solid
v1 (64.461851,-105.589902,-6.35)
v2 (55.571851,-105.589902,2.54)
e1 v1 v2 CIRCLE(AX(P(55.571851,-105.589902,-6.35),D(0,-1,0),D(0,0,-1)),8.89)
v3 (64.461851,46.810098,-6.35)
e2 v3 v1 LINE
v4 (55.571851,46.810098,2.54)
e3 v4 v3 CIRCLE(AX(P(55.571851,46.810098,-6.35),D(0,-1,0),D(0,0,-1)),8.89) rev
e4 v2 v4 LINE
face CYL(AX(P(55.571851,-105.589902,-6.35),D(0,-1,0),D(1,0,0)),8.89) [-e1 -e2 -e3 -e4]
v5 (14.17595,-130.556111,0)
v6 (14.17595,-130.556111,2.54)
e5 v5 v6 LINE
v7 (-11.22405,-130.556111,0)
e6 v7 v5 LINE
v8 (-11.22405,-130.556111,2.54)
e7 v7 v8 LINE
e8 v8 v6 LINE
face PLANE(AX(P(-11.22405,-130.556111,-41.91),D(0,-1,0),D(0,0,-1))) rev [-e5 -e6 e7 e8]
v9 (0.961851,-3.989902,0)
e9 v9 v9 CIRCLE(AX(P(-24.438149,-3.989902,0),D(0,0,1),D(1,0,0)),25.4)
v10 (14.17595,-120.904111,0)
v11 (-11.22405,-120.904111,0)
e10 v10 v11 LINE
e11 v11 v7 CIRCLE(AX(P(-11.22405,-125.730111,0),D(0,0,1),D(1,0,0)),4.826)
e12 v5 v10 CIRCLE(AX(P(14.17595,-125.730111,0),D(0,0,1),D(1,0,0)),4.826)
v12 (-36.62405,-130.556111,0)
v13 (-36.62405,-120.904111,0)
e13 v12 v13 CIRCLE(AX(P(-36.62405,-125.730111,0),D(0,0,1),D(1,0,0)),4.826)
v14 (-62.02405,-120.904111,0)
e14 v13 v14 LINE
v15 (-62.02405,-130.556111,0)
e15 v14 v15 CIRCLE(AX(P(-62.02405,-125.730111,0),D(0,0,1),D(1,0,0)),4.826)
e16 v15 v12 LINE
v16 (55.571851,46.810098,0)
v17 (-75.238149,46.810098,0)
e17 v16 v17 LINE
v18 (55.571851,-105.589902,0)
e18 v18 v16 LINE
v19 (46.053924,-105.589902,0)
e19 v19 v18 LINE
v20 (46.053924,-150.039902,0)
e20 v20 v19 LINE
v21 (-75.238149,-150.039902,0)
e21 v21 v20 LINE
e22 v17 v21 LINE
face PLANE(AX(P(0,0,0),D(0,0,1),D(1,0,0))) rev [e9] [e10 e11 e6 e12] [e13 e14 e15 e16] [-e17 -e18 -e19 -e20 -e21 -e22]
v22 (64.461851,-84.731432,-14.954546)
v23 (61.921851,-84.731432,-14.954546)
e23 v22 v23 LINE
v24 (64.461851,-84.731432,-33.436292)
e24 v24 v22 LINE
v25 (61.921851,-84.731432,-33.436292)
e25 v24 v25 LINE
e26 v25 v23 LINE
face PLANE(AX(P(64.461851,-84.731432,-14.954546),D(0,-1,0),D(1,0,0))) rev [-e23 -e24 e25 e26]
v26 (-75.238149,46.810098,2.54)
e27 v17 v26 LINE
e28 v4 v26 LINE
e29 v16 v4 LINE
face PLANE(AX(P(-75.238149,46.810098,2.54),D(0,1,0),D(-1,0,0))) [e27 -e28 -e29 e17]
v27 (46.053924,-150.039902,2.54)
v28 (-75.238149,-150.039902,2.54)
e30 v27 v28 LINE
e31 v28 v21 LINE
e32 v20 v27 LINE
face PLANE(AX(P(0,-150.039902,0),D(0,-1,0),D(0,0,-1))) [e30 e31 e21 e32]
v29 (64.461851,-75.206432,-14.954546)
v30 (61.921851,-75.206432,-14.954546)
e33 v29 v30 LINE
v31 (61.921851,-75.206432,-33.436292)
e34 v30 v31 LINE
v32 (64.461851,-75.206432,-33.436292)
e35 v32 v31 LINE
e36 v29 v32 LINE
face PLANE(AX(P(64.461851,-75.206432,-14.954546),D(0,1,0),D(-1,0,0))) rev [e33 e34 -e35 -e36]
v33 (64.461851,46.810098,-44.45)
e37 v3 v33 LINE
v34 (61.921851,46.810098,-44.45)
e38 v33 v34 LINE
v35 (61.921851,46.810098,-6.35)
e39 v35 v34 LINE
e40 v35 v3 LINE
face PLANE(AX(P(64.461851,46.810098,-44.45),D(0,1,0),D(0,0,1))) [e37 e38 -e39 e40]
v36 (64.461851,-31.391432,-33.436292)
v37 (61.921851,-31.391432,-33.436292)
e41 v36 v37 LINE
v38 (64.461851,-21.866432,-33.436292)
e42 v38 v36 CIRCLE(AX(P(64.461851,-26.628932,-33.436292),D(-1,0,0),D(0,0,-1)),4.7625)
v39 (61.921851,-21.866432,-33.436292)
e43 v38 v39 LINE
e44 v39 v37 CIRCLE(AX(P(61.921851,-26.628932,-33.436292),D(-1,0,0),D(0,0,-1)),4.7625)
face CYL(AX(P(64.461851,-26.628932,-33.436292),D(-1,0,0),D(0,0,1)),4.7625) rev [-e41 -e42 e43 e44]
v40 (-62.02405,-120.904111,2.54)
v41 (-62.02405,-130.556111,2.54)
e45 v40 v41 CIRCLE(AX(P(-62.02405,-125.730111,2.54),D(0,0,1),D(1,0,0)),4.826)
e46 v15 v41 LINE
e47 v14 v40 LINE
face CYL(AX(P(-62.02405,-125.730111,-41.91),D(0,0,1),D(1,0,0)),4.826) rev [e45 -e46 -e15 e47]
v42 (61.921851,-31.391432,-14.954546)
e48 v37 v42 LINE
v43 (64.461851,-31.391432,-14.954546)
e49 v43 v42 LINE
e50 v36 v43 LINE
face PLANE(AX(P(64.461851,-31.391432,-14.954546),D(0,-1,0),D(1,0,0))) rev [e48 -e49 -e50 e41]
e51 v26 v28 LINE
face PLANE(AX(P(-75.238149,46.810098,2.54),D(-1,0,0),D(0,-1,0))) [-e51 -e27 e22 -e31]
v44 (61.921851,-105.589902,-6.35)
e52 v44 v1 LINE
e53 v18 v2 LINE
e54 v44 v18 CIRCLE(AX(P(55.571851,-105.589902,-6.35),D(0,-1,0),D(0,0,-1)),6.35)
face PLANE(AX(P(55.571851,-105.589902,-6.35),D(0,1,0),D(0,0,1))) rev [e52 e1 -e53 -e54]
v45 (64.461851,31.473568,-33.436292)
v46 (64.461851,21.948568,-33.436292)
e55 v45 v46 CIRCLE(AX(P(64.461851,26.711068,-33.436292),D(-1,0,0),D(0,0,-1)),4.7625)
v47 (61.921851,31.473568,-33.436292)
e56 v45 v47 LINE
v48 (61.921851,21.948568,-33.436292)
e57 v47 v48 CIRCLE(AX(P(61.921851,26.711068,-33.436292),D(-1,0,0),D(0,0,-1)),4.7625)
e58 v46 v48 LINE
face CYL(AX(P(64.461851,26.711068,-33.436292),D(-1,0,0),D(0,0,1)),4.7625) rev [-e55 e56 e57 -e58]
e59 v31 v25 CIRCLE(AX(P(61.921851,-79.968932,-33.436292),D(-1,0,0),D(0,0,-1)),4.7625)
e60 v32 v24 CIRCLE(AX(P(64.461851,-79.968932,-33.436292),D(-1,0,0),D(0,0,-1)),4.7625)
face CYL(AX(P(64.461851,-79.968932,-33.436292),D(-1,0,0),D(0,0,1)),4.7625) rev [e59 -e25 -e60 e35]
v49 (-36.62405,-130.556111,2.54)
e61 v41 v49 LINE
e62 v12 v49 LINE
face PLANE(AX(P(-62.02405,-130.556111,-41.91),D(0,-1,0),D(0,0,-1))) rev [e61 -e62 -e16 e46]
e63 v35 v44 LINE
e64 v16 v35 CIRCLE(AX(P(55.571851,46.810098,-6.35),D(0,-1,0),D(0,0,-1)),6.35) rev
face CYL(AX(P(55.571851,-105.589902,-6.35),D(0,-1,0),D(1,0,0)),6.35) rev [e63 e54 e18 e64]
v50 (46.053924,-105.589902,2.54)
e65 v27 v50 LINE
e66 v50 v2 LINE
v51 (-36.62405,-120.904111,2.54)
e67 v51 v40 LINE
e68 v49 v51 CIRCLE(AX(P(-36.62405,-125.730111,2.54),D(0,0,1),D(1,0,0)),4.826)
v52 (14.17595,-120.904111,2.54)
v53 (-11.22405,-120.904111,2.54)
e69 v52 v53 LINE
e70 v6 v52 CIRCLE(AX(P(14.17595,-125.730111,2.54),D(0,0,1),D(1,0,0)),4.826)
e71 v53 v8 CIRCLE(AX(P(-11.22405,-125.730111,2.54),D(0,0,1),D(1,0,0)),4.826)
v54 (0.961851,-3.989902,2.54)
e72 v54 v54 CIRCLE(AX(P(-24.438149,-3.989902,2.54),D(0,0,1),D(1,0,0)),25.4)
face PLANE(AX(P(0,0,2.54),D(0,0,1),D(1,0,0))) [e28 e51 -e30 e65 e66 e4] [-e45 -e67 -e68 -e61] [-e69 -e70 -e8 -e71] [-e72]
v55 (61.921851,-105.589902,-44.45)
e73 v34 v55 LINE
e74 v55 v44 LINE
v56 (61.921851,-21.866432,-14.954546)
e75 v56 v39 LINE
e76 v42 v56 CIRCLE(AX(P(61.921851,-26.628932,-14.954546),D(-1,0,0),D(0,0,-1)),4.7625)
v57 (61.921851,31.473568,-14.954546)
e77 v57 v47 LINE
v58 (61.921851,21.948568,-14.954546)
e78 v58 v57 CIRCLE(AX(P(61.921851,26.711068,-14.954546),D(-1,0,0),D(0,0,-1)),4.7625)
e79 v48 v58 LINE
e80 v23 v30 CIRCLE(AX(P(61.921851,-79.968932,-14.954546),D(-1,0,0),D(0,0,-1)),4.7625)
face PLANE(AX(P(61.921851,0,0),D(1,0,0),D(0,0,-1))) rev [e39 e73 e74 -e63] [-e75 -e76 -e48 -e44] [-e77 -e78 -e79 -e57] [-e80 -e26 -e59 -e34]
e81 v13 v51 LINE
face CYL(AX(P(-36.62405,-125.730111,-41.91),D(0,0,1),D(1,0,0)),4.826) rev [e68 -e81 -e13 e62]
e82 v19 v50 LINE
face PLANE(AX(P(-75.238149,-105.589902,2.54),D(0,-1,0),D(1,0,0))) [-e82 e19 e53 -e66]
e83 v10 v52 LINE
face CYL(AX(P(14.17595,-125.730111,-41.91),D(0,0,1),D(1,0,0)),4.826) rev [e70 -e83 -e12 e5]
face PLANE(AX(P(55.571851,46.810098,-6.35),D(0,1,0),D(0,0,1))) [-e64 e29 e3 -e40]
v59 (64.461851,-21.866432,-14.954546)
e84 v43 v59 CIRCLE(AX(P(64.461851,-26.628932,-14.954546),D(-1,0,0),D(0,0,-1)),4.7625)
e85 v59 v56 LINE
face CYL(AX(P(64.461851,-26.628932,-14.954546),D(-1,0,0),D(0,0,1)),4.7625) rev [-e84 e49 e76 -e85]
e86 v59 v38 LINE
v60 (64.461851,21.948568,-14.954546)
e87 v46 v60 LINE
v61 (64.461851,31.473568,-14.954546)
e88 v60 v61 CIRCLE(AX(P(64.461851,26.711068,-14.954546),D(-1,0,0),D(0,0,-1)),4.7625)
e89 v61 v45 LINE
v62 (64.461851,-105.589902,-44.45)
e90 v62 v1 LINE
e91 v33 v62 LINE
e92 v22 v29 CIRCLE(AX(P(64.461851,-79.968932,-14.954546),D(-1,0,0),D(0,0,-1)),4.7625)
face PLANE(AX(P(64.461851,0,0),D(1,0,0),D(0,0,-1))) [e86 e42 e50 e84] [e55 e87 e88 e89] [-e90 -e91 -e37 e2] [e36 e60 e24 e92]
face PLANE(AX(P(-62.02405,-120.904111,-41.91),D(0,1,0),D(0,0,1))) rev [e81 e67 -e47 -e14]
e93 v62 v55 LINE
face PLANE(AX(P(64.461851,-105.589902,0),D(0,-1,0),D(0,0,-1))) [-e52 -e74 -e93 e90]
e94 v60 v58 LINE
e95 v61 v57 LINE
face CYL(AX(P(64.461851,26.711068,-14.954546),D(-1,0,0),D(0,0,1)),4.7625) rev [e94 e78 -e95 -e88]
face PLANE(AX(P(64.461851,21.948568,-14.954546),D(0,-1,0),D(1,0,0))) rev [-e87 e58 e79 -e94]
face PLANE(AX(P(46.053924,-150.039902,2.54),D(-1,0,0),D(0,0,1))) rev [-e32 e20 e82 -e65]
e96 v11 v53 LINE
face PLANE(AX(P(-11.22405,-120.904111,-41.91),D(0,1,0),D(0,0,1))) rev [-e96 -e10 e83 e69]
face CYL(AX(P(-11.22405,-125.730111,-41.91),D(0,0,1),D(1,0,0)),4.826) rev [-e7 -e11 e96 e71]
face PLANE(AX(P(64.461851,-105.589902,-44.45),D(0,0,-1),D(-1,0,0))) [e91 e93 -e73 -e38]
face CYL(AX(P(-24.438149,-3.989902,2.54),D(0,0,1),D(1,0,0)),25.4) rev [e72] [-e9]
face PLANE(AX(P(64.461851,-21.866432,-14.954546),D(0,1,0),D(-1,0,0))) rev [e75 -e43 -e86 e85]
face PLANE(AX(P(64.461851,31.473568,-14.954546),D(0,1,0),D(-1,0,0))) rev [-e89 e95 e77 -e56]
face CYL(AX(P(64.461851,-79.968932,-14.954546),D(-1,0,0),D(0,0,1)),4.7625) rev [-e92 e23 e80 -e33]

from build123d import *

# Parameters (mm, degrees)
SKETCH1_W                    = 139.7
SKETCH1_H                    = 152.4
SKETCH1_R                    = 25.4
BOSS_EXTRUDE1_DEPTH          = 2.54
EDGE_FLANGE1_STRIP_W         = 22.86
EDGE_FLANGE1_STRIP_H         = 2.54
EDGE_FLANGE1_STRIP_CUT_DEPTH = 152.4
EDGE_FLANGE1_DEPTH           = 152.4
CUT_EXTRUDE3_DEPTH           = 2.54
SKETCH10_W                   = 121.292072418
SKETCH10_H                   = 2.54
BOSS_EXTRUDE2_DEPTH          = 44.45
CUT_EXTRUDE2_DEPTH           = 44.45


# Sheet-metal steps are written as plain solids
with BuildPart() as part:
    # Sketch1 → Boss-Extrude1 (new body)
    with BuildSketch(Plane.XY):
        with Locations((-5.388148668, -29.389901823)):
            Rectangle(SKETCH1_W, SKETCH1_H)
        with Locations((-24.438148668, -3.989901823)):
            Circle(SKETCH1_R, mode=Mode.SUBTRACT)
    extrude(amount=BOSS_EXTRUDE1_DEPTH)

    # Edge-Flange1 strip (across the edge) → Edge-Flange1 strip cut (cut)
    with BuildSketch(Plane(origin=(64.461851332, 46.810098177, 0), x_dir=(-1, 0, 0), z_dir=(0, -1, 0))):
        with Locations((-2.54, -1.27)):
            Rectangle(EDGE_FLANGE1_STRIP_W, EDGE_FLANGE1_STRIP_H)
    extrude(amount=EDGE_FLANGE1_STRIP_CUT_DEPTH, mode=Mode.SUBTRACT)

    # Edge-Flange1 section (across the edge) → Edge-Flange1 (add)
    with BuildSketch(Plane(origin=(64.461851332, 46.810098177, 0), x_dir=(-1, 0, 0), z_dir=(0, -1, 0))):
        with BuildLine():
            Line((0, 6.35), (0, 44.45))
            Line((0, 44.45), (2.54, 44.45))
            Line((2.54, 44.45), (2.54, 6.35))
            ThreePointArc((2.54, 6.35), (4.399871939, 1.859871939), (8.89, 0))
            Line((8.89, 0), (8.89, -2.54))
            ThreePointArc((8.89, -2.54), (2.603820715, 0.063820715), (0, 6.35))
        make_face()
    extrude(amount=EDGE_FLANGE1_DEPTH)

    # Sketch9 → Cut-Extrude3 (cut)
    with BuildSketch(Plane.ZY.offset(-61.921851332)):
        with BuildLine():
            Line((-14.954545697, 31.473568276), (-33.436292004, 31.473568276))
            ThreePointArc((-33.436292004, 31.473568276), (-38.198792004, 26.711068276), (-33.436292004, 21.948568276))
            Line((-33.436292004, 21.948568276), (-14.954545697, 21.948568276))
            ThreePointArc((-14.954545697, 21.948568276), (-10.192045697, 26.711068276), (-14.954545697, 31.473568276))
        make_face()
        with BuildLine():
            Line((-14.954545697, -21.866431724), (-33.436292004, -21.866431724))
            ThreePointArc((-33.436292004, -21.866431724), (-38.198792004, -26.628931724), (-33.436292004, -31.391431724))
            Line((-33.436292004, -31.391431724), (-14.954545697, -31.391431724))
            ThreePointArc((-14.954545697, -31.391431724), (-10.192045697, -26.628931724), (-14.954545697, -21.866431724))
        make_face()
        with BuildLine():
            Line((-14.954545697, -75.206431724), (-33.436292004, -75.206431724))
            ThreePointArc((-33.436292004, -75.206431724), (-38.198792004, -79.968931724), (-33.436292004, -84.731431724))
            Line((-33.436292004, -84.731431724), (-14.954545697, -84.731431724))
            ThreePointArc((-14.954545697, -84.731431724), (-10.192045697, -79.968931724), (-14.954545697, -75.206431724))
        make_face()
    extrude(amount=-CUT_EXTRUDE3_DEPTH, mode=Mode.SUBTRACT)

    # Sketch10 → Boss-Extrude2 (add)
    with BuildSketch(Plane.XZ.offset(105.589901823)):
        with Locations((-14.592112459, 1.27)):
            Rectangle(SKETCH10_W, SKETCH10_H)
    extrude(amount=BOSS_EXTRUDE2_DEPTH)

    # Sketch11 → Cut-Extrude2 (cut)
    with BuildSketch(Plane.XY.offset(2.54)):
        with BuildLine():
            Line((-62.024050091, -120.904110835), (-36.624050091, -120.904110835))
            ThreePointArc((-36.624050091, -120.904110835), (-31.798050091, -125.730110835), (-36.624050091, -130.556110835))
            Line((-36.624050091, -130.556110835), (-62.024050091, -130.556110835))
            ThreePointArc((-62.024050091, -130.556110835), (-66.850050091, -125.730110835), (-62.024050091, -120.904110835))
        make_face()
        with BuildLine():
            Line((-11.224050091, -120.904110835), (14.175949909, -120.904110835))
            ThreePointArc((14.175949909, -120.904110835), (19.001949909, -125.730110835), (14.175949909, -130.556110835))
            Line((14.175949909, -130.556110835), (-11.224050091, -130.556110835))
            ThreePointArc((-11.224050091, -130.556110835), (-16.050050091, -125.730110835), (-11.224050091, -120.904110835))
        make_face()
    extrude(amount=-CUT_EXTRUDE2_DEPTH, mode=Mode.SUBTRACT)


solid = part.part
